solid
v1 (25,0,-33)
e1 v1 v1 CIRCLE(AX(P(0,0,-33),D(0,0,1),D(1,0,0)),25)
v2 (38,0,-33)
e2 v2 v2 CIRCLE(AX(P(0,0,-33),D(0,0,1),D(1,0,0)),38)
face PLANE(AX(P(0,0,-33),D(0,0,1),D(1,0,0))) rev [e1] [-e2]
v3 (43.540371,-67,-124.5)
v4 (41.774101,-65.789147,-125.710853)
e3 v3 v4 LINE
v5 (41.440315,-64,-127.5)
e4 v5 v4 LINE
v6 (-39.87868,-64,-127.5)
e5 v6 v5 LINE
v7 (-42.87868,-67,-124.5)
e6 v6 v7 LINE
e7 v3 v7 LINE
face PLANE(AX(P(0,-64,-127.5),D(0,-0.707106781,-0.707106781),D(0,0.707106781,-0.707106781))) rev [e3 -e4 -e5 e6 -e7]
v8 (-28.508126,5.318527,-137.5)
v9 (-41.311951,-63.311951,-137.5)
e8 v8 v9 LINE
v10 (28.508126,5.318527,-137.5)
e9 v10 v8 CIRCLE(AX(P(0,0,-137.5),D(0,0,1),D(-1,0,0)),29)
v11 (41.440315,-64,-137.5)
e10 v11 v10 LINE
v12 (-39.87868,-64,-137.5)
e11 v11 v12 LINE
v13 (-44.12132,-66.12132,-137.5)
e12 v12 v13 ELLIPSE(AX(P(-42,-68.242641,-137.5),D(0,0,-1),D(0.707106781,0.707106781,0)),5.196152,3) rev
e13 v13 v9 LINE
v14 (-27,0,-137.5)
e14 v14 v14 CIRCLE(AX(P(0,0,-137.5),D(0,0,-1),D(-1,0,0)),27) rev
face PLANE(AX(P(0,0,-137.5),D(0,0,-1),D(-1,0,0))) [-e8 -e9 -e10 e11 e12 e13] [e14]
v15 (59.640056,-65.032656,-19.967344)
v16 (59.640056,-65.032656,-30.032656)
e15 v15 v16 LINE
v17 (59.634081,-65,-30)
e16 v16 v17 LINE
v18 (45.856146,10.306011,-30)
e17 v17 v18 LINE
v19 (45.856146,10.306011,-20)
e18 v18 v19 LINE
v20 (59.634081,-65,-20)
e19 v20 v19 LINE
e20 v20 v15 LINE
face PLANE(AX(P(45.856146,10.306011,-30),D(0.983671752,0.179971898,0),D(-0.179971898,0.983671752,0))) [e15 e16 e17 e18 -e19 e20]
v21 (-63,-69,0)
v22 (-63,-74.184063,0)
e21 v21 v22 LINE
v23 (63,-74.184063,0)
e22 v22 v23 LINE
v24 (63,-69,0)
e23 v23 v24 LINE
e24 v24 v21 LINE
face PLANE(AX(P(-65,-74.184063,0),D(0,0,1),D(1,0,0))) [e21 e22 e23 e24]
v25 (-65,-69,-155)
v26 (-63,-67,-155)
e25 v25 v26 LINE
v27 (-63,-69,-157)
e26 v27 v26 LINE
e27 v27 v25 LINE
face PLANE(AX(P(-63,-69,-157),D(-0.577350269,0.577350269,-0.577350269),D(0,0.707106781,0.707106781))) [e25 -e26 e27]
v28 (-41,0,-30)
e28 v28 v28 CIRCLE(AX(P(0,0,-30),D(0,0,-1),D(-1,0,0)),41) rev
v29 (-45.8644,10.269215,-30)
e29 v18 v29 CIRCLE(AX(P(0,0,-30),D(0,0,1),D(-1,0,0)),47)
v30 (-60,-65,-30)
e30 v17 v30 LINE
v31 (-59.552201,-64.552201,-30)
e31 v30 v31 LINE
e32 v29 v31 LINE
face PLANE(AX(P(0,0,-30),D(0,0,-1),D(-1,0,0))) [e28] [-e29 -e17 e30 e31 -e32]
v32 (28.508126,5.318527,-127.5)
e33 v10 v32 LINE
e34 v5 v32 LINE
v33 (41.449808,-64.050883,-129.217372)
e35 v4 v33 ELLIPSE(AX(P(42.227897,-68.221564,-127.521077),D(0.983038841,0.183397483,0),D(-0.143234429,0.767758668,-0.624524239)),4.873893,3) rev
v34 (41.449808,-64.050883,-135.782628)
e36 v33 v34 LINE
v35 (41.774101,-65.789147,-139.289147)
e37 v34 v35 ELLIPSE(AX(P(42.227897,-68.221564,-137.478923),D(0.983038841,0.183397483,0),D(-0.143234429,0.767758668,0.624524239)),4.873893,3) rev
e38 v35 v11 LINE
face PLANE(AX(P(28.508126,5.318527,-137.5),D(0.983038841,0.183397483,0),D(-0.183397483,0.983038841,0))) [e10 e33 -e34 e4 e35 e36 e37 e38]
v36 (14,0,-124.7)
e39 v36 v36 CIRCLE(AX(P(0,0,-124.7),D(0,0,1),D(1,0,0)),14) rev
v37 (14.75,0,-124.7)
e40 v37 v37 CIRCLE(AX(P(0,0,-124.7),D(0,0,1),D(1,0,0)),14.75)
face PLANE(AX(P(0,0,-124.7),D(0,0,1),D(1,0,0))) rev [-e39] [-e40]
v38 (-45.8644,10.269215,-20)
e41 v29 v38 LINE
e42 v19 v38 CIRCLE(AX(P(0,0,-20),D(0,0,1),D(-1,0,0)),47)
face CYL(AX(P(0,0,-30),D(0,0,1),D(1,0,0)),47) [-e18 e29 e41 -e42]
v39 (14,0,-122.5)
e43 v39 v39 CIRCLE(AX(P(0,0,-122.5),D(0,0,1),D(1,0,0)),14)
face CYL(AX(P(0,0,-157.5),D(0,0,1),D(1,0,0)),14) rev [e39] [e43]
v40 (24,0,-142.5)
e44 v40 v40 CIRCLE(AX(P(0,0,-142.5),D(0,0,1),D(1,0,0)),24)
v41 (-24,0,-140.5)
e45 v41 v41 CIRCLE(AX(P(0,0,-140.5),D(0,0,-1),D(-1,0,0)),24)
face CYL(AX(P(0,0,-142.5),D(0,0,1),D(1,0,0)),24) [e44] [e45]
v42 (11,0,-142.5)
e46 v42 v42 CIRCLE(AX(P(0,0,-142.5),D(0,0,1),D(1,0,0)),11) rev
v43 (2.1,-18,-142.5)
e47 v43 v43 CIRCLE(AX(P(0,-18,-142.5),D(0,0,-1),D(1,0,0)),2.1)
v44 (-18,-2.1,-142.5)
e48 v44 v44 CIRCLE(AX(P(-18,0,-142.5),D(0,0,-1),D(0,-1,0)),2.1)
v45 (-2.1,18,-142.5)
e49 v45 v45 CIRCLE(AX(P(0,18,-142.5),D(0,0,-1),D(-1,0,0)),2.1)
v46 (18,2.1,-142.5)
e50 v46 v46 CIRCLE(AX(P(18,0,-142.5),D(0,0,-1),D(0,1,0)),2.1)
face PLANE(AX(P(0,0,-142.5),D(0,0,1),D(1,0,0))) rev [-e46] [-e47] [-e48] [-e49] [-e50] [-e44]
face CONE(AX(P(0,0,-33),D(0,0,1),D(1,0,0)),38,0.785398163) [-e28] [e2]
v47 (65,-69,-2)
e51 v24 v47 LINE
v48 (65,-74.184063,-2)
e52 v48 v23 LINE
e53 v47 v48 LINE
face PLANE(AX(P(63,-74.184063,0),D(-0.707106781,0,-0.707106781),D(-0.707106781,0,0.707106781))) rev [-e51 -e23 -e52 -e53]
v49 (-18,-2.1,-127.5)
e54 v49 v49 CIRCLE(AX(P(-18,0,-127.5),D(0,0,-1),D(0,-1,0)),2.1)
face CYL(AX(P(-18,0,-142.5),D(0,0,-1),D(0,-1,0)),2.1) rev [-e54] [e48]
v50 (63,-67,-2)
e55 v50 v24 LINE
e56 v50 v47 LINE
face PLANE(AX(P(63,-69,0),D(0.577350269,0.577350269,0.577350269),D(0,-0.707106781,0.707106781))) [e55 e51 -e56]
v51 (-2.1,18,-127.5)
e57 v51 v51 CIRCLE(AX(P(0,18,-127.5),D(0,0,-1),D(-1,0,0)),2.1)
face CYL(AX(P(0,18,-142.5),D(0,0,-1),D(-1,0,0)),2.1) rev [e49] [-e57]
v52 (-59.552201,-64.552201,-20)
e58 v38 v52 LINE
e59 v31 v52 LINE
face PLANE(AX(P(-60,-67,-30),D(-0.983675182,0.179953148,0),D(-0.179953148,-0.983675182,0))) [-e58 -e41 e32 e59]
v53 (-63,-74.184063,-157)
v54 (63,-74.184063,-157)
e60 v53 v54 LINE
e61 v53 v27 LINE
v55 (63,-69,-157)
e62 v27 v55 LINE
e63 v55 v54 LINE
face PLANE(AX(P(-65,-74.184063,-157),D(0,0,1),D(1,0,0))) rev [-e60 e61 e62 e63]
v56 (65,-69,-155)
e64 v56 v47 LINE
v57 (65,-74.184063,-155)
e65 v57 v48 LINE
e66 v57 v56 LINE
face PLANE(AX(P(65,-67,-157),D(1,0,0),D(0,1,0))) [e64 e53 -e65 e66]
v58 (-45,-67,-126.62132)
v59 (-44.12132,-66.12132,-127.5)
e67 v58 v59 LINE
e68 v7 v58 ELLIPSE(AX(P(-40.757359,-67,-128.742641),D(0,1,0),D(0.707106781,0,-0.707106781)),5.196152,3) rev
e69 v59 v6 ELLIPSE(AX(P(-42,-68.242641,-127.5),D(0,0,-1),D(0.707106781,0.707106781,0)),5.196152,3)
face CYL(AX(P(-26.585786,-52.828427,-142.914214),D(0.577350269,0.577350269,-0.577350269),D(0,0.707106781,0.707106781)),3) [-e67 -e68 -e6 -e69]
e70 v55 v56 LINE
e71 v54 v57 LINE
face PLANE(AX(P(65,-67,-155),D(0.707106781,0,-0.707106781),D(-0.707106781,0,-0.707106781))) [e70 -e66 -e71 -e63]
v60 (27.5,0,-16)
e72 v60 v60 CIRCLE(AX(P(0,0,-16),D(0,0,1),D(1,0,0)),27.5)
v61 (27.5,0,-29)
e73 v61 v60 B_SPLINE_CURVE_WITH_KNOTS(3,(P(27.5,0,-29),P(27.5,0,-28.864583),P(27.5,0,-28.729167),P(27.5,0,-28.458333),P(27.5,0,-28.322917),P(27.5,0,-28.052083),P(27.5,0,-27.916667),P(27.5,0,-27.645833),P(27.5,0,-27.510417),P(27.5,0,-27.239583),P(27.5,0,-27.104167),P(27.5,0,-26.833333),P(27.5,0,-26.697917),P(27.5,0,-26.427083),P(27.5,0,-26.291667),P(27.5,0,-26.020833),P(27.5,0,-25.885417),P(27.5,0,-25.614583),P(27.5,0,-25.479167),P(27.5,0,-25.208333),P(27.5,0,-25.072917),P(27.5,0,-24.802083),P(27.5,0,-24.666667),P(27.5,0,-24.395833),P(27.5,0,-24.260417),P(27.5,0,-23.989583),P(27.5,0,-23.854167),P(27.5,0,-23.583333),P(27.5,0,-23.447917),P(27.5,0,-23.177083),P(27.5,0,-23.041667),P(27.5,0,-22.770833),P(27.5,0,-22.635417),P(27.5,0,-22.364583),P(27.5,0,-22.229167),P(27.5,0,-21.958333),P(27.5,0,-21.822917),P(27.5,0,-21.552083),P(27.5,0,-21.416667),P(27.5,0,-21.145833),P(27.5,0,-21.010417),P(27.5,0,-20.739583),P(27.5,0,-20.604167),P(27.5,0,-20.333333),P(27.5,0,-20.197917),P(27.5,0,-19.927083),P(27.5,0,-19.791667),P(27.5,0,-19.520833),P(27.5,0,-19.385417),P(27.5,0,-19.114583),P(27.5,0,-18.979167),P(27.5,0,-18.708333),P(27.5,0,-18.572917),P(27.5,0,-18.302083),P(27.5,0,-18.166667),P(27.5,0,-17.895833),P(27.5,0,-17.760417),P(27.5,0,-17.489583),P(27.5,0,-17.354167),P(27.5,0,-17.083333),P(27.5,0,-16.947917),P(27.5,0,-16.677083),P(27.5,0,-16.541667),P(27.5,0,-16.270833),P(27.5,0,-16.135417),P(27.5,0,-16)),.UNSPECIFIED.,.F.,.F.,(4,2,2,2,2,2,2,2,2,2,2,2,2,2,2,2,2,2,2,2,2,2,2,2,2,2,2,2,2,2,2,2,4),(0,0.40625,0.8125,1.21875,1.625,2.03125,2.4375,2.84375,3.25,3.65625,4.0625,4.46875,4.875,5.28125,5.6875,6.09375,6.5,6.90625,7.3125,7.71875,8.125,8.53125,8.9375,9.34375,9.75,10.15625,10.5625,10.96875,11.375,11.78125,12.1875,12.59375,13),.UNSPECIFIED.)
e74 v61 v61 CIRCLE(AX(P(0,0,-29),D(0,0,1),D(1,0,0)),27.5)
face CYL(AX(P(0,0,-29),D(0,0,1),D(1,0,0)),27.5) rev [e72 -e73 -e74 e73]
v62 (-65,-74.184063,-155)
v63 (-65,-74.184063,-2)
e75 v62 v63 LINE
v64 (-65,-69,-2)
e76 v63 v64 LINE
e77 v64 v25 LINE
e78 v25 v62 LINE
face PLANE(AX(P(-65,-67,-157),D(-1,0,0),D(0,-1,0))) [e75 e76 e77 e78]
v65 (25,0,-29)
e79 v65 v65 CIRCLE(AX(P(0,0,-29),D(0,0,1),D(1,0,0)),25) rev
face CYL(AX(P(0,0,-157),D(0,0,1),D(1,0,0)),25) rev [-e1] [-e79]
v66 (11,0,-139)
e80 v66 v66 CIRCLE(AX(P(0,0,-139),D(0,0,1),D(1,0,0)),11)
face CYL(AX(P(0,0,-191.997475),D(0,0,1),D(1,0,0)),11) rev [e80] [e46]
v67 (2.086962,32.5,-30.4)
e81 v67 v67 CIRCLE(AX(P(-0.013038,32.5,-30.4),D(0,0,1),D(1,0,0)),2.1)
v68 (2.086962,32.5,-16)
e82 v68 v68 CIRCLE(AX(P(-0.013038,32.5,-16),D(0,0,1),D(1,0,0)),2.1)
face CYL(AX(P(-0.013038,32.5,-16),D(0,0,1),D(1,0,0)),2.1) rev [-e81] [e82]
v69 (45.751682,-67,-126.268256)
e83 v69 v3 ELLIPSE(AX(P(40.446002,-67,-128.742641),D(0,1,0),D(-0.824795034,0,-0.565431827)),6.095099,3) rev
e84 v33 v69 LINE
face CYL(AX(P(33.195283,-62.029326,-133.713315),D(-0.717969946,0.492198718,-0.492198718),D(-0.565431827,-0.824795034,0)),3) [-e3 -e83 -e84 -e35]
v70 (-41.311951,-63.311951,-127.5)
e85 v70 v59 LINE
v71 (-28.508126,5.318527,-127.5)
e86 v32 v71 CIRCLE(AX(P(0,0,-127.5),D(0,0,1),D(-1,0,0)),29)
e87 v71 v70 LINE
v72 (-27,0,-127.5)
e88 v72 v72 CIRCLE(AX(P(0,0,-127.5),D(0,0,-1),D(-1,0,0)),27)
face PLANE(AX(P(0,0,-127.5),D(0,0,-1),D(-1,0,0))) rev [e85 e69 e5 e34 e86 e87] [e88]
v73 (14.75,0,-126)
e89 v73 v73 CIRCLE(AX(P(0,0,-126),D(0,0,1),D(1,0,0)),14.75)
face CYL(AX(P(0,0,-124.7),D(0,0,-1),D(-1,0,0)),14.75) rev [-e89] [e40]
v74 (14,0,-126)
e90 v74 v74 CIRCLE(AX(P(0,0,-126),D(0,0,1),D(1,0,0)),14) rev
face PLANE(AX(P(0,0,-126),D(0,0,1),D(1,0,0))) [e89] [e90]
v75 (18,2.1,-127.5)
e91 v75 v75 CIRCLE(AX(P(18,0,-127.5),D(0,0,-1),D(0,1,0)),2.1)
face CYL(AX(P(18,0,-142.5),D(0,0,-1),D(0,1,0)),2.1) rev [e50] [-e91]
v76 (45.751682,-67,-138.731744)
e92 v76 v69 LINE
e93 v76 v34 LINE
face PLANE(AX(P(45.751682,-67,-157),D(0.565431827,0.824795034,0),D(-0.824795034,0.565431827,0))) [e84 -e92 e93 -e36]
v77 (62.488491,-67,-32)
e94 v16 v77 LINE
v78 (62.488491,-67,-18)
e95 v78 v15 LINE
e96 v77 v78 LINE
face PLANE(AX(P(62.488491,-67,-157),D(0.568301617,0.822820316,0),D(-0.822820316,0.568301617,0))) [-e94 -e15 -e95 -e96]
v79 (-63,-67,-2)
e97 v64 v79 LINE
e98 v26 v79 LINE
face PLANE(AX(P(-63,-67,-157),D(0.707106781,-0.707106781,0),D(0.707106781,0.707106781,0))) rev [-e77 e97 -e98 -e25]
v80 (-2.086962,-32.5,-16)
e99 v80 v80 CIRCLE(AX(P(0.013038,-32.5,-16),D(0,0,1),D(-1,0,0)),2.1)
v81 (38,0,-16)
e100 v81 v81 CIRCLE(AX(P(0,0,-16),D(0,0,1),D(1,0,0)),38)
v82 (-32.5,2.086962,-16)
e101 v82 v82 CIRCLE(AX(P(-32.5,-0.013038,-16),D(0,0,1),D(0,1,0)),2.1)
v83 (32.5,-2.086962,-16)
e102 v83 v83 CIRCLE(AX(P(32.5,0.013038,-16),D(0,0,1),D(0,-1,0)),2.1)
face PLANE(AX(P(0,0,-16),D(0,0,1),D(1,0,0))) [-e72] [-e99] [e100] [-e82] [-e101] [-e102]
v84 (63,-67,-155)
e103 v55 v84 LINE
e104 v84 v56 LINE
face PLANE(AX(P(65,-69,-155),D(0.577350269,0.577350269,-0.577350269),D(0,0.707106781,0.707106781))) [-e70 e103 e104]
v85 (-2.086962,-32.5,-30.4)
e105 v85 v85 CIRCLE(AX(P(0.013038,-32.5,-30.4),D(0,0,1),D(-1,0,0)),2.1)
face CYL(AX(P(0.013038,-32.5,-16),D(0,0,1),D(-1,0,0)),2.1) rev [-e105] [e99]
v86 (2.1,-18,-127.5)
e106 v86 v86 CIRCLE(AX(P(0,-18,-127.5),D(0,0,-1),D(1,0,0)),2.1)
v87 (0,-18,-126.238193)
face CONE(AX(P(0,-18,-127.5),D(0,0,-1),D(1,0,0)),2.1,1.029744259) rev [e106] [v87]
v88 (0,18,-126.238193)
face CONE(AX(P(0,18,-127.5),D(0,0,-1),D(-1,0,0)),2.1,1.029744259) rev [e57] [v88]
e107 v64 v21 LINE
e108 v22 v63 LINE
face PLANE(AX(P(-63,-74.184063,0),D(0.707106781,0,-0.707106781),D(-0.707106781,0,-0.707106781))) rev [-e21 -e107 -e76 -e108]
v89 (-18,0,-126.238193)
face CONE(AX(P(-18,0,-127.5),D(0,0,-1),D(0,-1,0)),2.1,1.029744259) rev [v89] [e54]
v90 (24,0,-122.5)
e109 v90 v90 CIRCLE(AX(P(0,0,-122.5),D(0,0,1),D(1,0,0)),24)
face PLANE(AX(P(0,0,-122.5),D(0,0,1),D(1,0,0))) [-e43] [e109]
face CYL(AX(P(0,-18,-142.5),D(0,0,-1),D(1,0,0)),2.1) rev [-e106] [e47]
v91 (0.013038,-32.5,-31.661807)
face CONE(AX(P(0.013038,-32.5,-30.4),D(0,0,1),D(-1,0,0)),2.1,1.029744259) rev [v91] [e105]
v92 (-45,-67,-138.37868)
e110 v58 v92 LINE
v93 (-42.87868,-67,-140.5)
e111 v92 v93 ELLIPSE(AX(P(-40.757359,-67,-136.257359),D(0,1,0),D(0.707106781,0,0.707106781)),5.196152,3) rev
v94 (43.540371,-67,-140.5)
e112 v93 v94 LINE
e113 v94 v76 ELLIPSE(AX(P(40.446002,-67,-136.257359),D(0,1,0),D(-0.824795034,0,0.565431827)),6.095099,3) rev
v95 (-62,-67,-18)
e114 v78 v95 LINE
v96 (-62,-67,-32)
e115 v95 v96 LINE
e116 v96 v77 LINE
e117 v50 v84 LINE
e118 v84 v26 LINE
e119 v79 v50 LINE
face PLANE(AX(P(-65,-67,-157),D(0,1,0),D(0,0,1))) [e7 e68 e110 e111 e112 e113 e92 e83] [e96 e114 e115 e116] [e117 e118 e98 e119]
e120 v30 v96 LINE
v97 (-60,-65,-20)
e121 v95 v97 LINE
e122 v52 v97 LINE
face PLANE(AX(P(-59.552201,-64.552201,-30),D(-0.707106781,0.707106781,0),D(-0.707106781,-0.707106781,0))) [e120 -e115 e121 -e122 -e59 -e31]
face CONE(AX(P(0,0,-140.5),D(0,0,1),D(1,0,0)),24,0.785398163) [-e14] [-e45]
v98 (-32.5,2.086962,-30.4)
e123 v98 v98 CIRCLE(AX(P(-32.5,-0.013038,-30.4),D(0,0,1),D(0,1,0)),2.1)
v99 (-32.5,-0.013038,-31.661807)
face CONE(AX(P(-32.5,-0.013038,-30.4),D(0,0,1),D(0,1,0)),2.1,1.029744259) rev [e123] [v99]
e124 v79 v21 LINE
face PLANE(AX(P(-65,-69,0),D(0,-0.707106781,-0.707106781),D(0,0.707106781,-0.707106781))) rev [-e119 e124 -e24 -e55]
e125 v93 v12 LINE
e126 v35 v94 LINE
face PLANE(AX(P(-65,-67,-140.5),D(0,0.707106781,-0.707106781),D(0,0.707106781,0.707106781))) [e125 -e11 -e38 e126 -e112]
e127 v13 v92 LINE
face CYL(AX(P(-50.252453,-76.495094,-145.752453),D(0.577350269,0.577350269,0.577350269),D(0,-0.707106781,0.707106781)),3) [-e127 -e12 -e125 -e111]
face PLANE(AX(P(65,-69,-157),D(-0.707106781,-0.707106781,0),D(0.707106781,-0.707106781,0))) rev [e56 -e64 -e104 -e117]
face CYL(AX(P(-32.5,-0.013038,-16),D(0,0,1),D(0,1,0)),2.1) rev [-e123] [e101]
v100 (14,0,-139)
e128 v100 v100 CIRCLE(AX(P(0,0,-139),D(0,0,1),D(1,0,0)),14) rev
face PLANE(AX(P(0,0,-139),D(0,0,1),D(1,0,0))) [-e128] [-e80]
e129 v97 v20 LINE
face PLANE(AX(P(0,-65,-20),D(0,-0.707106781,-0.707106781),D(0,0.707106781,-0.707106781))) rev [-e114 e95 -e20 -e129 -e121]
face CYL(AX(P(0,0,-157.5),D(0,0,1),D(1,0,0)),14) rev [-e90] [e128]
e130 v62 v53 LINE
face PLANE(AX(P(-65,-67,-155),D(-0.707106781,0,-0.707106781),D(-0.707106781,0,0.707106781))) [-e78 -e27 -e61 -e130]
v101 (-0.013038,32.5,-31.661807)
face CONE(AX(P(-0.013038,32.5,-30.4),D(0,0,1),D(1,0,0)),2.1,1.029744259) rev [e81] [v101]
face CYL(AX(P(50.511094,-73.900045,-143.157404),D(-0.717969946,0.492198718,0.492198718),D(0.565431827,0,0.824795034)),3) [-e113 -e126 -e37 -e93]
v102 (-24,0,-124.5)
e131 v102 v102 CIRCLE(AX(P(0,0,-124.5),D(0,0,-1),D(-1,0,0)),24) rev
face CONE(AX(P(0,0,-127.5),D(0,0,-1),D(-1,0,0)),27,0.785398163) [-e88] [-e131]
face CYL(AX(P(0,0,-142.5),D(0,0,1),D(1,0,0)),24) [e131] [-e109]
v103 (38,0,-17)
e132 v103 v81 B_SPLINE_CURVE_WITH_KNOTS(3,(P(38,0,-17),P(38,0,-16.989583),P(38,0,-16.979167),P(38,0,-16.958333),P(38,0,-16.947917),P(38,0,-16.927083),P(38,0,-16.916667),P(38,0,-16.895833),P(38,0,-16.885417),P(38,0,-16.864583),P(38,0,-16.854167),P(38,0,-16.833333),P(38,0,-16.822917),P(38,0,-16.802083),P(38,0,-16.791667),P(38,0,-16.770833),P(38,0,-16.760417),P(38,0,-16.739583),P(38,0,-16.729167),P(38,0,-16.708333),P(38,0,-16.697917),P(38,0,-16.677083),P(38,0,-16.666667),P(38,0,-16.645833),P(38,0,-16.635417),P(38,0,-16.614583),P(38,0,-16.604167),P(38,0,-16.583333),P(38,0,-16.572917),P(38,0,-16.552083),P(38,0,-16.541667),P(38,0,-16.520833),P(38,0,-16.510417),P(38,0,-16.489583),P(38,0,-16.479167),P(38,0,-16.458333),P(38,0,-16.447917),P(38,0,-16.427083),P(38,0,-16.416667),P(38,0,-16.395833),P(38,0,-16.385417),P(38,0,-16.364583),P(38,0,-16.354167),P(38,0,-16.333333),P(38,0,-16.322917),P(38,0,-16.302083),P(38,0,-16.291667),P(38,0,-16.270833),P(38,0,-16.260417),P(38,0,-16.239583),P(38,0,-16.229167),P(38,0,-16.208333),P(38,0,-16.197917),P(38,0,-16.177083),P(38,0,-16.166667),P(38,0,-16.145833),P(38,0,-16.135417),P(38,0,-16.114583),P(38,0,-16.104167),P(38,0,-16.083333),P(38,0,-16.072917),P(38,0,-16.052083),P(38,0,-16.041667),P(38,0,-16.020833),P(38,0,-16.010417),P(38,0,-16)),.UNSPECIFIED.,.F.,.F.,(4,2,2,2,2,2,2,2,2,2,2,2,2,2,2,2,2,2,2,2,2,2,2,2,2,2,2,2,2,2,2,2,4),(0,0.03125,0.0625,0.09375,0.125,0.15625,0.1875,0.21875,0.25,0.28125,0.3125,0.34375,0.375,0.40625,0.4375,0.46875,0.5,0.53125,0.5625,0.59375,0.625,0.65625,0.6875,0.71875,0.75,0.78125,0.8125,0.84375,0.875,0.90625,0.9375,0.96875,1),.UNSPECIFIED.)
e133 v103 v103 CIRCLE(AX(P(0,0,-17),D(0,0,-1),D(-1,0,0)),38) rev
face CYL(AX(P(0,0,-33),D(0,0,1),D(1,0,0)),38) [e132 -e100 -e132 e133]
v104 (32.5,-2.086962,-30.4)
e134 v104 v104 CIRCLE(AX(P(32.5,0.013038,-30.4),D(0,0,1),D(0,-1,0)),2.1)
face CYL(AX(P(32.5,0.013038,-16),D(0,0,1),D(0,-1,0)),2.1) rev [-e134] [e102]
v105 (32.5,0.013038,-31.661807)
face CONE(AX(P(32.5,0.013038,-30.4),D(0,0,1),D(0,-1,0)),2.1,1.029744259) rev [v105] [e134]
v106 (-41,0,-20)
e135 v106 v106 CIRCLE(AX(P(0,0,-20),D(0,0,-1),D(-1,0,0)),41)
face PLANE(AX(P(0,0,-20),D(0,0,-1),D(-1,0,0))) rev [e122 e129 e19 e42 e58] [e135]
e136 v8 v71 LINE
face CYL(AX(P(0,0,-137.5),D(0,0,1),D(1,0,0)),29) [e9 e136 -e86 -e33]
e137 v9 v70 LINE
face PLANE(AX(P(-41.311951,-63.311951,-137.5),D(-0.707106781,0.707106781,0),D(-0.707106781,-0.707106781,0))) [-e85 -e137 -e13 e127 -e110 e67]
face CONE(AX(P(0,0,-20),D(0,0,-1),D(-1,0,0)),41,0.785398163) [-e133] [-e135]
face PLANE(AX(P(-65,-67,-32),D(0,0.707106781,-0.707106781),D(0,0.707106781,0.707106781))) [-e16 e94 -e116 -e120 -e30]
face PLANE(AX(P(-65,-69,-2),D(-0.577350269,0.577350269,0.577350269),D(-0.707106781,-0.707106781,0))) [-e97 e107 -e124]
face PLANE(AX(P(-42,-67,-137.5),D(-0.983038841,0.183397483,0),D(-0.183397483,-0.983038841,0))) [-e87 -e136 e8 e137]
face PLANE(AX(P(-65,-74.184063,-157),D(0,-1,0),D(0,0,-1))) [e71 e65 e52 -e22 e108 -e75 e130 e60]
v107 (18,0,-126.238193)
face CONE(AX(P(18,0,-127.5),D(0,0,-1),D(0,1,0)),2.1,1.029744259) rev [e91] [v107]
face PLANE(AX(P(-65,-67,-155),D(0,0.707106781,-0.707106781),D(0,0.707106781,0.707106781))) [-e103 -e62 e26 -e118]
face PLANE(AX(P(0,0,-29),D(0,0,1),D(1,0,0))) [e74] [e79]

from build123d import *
from OCP.BRepFilletAPI import BRepFilletAPI_MakeChamfer

# Parameters (mm, degrees)
SKETCH1_W           = 130
SKETCH1_H           = 7.184063047
EXTRUDE2_DEPTH      = 157
EXTRUDE3_DEPTH      = 10
EXTRUDE4_DEPTH      = 4
EXTRUDE4_DEPTH_BACK = 13
SKETCH3_R           = 38
SKETCH4_R           = 25
CUT_EXTRUDE1_DEPTH  = 173.073458762
SKETCH5_R           = 27.5
CUT_EXTRUDE2_DEPTH  = 13
CIRPATTERN1_COUNT   = 4
EXTRUDE6_DEPTH      = 10
EXTRUDE7_DEPTH      = 5
EXTRUDE7_DEPTH_BACK = 15
SKETCH11_R          = 24
SKETCH12_R          = 14
CUT_EXTRUDE3_DEPTH  = 35
CHAMFER1_SIZE       = 3
CHAMFER2_SIZE       = 3
CHAMFER3_SIZE       = 2
CHAMFER3_SIZE2      = 2.488491183
CHAMFER3_SIZE2_2    = 2.488422509
CHAMFER4_SIZE       = 3
CHAMFER4_SIZE2      = 3.751681885
SKETCH13_R          = 14.75
CUT_EXTRUDE4_DEPTH  = 1.3
FILLET3_R           = 3
SKETCH14_R          = 17.5
SKETCH14_R_2        = 11
EXTRUDE8_DEPTH      = 3.5
CIRPATTERN2_COUNT   = 4
CHAMFER8_SIZE       = 2


with BuildPart() as part:
    # Sketch1 → Extrude2 (new body)
    with BuildSketch(Plane.XY):
        with Locations((0, -70.592031523)):
            Rectangle(SKETCH1_W, SKETCH1_H)
    extrude(amount=-EXTRUDE2_DEPTH)

    # Sketch2 → Extrude3 (add)
    with BuildSketch(Plane.XY.offset(-20)):
        with BuildLine():
            Line((-60, -67), (-45.86440041, 10.269214916))
            ThreePointArc((-45.86440041, 10.269214916), (-0.018855522, 46.999996218), (45.856146013, 10.30601149))
            Line((45.856146013, 10.30601149), (60, -67))
            Line((60, -67), (-60, -67))
        make_face()
    extrude(amount=-EXTRUDE3_DEPTH)

    # Sketch3 → Extrude4 (add, two sides: drawn at the far end of the back side and taken through both)
    with BuildSketch(Plane.XY.offset(-20).offset(-EXTRUDE4_DEPTH_BACK)):
        Circle(SKETCH3_R)
    extrude(amount=EXTRUDE4_DEPTH + EXTRUDE4_DEPTH_BACK)

    # Sketch4 → Cut-Extrude1 (cut, through all)
    with BuildSketch(Plane.XY.offset(-16)):
        Circle(SKETCH4_R)
    extrude(amount=-CUT_EXTRUDE1_DEPTH, mode=Mode.SUBTRACT)

    # Sketch5 → Cut-Extrude2 (cut)
    with BuildSketch(Plane.XY.offset(-16)):
        Circle(SKETCH5_R)
    extrude(amount=-CUT_EXTRUDE2_DEPTH, mode=Mode.SUBTRACT)

    # Sketch8 → M5 Tapped Hole1 (revolve, cut)
    with BuildSketch(Plane(origin=(-0.013038394, 32.5, -16), x_dir=(0, -1, 0), z_dir=(1, 0, 0))):
        Polygon((0, 0), (0, 15.6618073), (2.1, 14.4), (2.1, 0), align=None)
    m5_tapped_hole1 = revolve(axis=Axis((-0.013038394, 32.5, -9.65), (0, 0, -1)), mode=Mode.SUBTRACT)

    # CirPattern1: M5 Tapped Hole1 ×4 about axis
    cirpattern1_axis = Axis((0, 0, 0), (0, 0, 1))
    for i in range(1, CIRPATTERN1_COUNT):
        add(m5_tapped_hole1.rotate(cirpattern1_axis, i * 360 / CIRPATTERN1_COUNT), mode=Mode.SUBTRACT)

    # Sketch10 → Extrude6 (add)
    with BuildSketch(Plane.XY.offset(-127.5)):
        with BuildLine():
            Line((-42, -67), (-28.508126396, 5.318526994))
            ThreePointArc((-28.508126396, 5.318526994), (0, 29), (28.508126396, 5.318526994))
            Line((28.508126396, 5.318526994), (42, -67))
            Line((42, -67), (-42, -67))
        make_face()
    extrude(amount=-EXTRUDE6_DEPTH)

    # Sketch11 → Extrude7 (add, two sides: drawn at the far end of the back side and taken through both)
    with BuildSketch(Plane.XY.offset(-127.5).offset(-EXTRUDE7_DEPTH_BACK)):
        Circle(SKETCH11_R)
    extrude(amount=EXTRUDE7_DEPTH + EXTRUDE7_DEPTH_BACK)

    # Sketch12 → Cut-Extrude3 (cut)
    with BuildSketch(Plane.XY.offset(-122.5)):
        Circle(SKETCH12_R)
    extrude(amount=-CUT_EXTRUDE3_DEPTH, mode=Mode.SUBTRACT)

    # Chamfer1
    chamfer1_edges = [part.edges().sort_by_distance(p)[0] for p in [
        (-38, 0, -20),
    ]]
    chamfer(chamfer1_edges, length=CHAMFER1_SIZE)

    # Chamfer2
    chamfer2_edges = [part.edges().sort_by_distance(p)[0] for p in [
        (-38, 0, -30),
    ]]
    chamfer(chamfer2_edges, length=CHAMFER2_SIZE - 0.0001)  # a hair under: the kernel refuses the full size

    # Chamfer3: one chamfer whose edges measure the first distance from different faces: ONE call of the kernel's chamfer builder (chamfer() names one face for all edges)
    chamfer3_edges_1 = [part.edges().sort_by_distance(p)[0] for p in [
        (0, -67, -30),
        (0, -67, -20),
    ]]
    chamfer3_edges_2 = [part.edges().sort_by_distance(p)[0] for p in [
        (60, -67, -25),
    ]]
    chamfer3_side_2 = [part.faces().sort_by_distance(p)[0] for p in [
        (52.928073007, -28.346994255, -25),
    ]]
    chamfer3_edges_3 = [part.edges().sort_by_distance(p)[0] for p in [
        (-60, -67, -25),
    ]]
    chamfer3_side_3 = [part.faces().sort_by_distance(p)[0] for p in [
        (0, -67, -79.525585193),
    ]]
    chamfer3 = BRepFilletAPI_MakeChamfer(part.part.solid().wrapped)
    for e in chamfer3_edges_1:
        chamfer3.Add(CHAMFER3_SIZE, e.wrapped)
    for e in chamfer3_edges_2:
        chamfer3.Add(CHAMFER3_SIZE, CHAMFER3_SIZE2, e.wrapped, chamfer3_side_2[0].wrapped)  # the first distance lies on this face
    for e in chamfer3_edges_3:
        chamfer3.Add(CHAMFER3_SIZE, CHAMFER3_SIZE2_2, e.wrapped, chamfer3_side_3[0].wrapped)  # the first distance lies on this face
    add(Compound.cast(chamfer3.Shape()), mode=Mode.REPLACE)

    # Chamfer4: one chamfer whose edges measure the first distance from different faces: ONE call of the kernel's chamfer builder (chamfer() names one face for all edges)
    chamfer4_edges_1 = [part.edges().sort_by_distance(p)[0] for p in [
        (0, -67, -137.5),
        (0, -67, -127.5),
        (-24, 0, -137.5),
        (-24, 0, -127.5),
    ]]
    chamfer4_edges_2 = [part.edges().sort_by_distance(p)[0] for p in [
        (42, -67, -132.5),
    ]]
    chamfer4_side_2 = [part.faces().sort_by_distance(p)[0] for p in [
        (35.254063198, -30.840736503, -132.5),
    ]]
    chamfer4_edges_3 = [part.edges().sort_by_distance(p)[0] for p in [
        (-42, -67, -132.5),
    ]]
    chamfer4_side_3 = [part.faces().sort_by_distance(p)[0] for p in [
        (-0.023878211, -67, -81.18589483),
    ]]
    chamfer4 = BRepFilletAPI_MakeChamfer(part.part.solid().wrapped)
    for e in chamfer4_edges_1:
        chamfer4.Add(CHAMFER4_SIZE, e.wrapped)
    for e in chamfer4_edges_2:
        chamfer4.Add(CHAMFER4_SIZE, CHAMFER4_SIZE2, e.wrapped, chamfer4_side_2[0].wrapped)  # the first distance lies on this face
    for e in chamfer4_edges_3:
        chamfer4.Add(CHAMFER4_SIZE, CHAMFER4_SIZE2, e.wrapped, chamfer4_side_3[0].wrapped)  # the first distance lies on this face
    add(Compound.cast(chamfer4.Shape()), mode=Mode.REPLACE)

    # Sketch13 → Cut-Extrude4 (cut)
    with BuildSketch(Plane.XY.offset(-126)):
        Circle(SKETCH13_R)
    extrude(amount=CUT_EXTRUDE4_DEPTH, mode=Mode.SUBTRACT)

    # Fillet3
    fillet3_edges = [part.edges().sort_by_distance(p)[0] for p in [
        (-43.5, -65.5, -139),
        (-43.5, -65.5, -126),
        (43.600744719, -65.525441738, -139.025441738),
        (43.600744719, -65.525441738, -125.974558262),
    ]]
    fillet(fillet3_edges, radius=FILLET3_R)

    # Sketch14 → Extrude8 (add)
    with BuildSketch(Plane.XY.offset(-139)):
        Circle(SKETCH14_R)
        Circle(SKETCH14_R_2, mode=Mode.SUBTRACT)
    extrude(amount=-EXTRUDE8_DEPTH)

    # Sketch15 → M5 Tapped Hole2 (revolve, cut)
    with BuildSketch(Plane(origin=(0, 18, -142.5), x_dir=(0, 1, 0), z_dir=(1, 0, 0))):
        Polygon((0, 0), (0, 16.2618073), (2.1, 15), (2.1, 0), align=None)
    m5_tapped_hole2 = revolve(axis=Axis((0, 18, -148.85), (0, 0, 1)), mode=Mode.SUBTRACT)

    # CirPattern2: M5 Tapped Hole2 ×4 about axis
    cirpattern2_axis = Axis((0, 0, 0), (0, 0, 1))
    for i in range(1, CIRPATTERN2_COUNT):
        add(m5_tapped_hole2.rotate(cirpattern2_axis, i * 360 / CIRPATTERN2_COUNT), mode=Mode.SUBTRACT)

    # Chamfer8
    chamfer8_edges = [part.edges().sort_by_distance(p)[0] for p in [
        (65, -70.592031524, -157),
        (0, -67, -157),
        (-65, -70.592031524, -157),
        (0, -67, 0),
        (65, -70.592031524, 0),
        (-65, -70.592031524, 0),
        (-65, -67, -78.5),
        (65, -67, -78.5),
    ]]
    chamfer(chamfer8_edges, length=CHAMFER8_SIZE)


solid = part.part
